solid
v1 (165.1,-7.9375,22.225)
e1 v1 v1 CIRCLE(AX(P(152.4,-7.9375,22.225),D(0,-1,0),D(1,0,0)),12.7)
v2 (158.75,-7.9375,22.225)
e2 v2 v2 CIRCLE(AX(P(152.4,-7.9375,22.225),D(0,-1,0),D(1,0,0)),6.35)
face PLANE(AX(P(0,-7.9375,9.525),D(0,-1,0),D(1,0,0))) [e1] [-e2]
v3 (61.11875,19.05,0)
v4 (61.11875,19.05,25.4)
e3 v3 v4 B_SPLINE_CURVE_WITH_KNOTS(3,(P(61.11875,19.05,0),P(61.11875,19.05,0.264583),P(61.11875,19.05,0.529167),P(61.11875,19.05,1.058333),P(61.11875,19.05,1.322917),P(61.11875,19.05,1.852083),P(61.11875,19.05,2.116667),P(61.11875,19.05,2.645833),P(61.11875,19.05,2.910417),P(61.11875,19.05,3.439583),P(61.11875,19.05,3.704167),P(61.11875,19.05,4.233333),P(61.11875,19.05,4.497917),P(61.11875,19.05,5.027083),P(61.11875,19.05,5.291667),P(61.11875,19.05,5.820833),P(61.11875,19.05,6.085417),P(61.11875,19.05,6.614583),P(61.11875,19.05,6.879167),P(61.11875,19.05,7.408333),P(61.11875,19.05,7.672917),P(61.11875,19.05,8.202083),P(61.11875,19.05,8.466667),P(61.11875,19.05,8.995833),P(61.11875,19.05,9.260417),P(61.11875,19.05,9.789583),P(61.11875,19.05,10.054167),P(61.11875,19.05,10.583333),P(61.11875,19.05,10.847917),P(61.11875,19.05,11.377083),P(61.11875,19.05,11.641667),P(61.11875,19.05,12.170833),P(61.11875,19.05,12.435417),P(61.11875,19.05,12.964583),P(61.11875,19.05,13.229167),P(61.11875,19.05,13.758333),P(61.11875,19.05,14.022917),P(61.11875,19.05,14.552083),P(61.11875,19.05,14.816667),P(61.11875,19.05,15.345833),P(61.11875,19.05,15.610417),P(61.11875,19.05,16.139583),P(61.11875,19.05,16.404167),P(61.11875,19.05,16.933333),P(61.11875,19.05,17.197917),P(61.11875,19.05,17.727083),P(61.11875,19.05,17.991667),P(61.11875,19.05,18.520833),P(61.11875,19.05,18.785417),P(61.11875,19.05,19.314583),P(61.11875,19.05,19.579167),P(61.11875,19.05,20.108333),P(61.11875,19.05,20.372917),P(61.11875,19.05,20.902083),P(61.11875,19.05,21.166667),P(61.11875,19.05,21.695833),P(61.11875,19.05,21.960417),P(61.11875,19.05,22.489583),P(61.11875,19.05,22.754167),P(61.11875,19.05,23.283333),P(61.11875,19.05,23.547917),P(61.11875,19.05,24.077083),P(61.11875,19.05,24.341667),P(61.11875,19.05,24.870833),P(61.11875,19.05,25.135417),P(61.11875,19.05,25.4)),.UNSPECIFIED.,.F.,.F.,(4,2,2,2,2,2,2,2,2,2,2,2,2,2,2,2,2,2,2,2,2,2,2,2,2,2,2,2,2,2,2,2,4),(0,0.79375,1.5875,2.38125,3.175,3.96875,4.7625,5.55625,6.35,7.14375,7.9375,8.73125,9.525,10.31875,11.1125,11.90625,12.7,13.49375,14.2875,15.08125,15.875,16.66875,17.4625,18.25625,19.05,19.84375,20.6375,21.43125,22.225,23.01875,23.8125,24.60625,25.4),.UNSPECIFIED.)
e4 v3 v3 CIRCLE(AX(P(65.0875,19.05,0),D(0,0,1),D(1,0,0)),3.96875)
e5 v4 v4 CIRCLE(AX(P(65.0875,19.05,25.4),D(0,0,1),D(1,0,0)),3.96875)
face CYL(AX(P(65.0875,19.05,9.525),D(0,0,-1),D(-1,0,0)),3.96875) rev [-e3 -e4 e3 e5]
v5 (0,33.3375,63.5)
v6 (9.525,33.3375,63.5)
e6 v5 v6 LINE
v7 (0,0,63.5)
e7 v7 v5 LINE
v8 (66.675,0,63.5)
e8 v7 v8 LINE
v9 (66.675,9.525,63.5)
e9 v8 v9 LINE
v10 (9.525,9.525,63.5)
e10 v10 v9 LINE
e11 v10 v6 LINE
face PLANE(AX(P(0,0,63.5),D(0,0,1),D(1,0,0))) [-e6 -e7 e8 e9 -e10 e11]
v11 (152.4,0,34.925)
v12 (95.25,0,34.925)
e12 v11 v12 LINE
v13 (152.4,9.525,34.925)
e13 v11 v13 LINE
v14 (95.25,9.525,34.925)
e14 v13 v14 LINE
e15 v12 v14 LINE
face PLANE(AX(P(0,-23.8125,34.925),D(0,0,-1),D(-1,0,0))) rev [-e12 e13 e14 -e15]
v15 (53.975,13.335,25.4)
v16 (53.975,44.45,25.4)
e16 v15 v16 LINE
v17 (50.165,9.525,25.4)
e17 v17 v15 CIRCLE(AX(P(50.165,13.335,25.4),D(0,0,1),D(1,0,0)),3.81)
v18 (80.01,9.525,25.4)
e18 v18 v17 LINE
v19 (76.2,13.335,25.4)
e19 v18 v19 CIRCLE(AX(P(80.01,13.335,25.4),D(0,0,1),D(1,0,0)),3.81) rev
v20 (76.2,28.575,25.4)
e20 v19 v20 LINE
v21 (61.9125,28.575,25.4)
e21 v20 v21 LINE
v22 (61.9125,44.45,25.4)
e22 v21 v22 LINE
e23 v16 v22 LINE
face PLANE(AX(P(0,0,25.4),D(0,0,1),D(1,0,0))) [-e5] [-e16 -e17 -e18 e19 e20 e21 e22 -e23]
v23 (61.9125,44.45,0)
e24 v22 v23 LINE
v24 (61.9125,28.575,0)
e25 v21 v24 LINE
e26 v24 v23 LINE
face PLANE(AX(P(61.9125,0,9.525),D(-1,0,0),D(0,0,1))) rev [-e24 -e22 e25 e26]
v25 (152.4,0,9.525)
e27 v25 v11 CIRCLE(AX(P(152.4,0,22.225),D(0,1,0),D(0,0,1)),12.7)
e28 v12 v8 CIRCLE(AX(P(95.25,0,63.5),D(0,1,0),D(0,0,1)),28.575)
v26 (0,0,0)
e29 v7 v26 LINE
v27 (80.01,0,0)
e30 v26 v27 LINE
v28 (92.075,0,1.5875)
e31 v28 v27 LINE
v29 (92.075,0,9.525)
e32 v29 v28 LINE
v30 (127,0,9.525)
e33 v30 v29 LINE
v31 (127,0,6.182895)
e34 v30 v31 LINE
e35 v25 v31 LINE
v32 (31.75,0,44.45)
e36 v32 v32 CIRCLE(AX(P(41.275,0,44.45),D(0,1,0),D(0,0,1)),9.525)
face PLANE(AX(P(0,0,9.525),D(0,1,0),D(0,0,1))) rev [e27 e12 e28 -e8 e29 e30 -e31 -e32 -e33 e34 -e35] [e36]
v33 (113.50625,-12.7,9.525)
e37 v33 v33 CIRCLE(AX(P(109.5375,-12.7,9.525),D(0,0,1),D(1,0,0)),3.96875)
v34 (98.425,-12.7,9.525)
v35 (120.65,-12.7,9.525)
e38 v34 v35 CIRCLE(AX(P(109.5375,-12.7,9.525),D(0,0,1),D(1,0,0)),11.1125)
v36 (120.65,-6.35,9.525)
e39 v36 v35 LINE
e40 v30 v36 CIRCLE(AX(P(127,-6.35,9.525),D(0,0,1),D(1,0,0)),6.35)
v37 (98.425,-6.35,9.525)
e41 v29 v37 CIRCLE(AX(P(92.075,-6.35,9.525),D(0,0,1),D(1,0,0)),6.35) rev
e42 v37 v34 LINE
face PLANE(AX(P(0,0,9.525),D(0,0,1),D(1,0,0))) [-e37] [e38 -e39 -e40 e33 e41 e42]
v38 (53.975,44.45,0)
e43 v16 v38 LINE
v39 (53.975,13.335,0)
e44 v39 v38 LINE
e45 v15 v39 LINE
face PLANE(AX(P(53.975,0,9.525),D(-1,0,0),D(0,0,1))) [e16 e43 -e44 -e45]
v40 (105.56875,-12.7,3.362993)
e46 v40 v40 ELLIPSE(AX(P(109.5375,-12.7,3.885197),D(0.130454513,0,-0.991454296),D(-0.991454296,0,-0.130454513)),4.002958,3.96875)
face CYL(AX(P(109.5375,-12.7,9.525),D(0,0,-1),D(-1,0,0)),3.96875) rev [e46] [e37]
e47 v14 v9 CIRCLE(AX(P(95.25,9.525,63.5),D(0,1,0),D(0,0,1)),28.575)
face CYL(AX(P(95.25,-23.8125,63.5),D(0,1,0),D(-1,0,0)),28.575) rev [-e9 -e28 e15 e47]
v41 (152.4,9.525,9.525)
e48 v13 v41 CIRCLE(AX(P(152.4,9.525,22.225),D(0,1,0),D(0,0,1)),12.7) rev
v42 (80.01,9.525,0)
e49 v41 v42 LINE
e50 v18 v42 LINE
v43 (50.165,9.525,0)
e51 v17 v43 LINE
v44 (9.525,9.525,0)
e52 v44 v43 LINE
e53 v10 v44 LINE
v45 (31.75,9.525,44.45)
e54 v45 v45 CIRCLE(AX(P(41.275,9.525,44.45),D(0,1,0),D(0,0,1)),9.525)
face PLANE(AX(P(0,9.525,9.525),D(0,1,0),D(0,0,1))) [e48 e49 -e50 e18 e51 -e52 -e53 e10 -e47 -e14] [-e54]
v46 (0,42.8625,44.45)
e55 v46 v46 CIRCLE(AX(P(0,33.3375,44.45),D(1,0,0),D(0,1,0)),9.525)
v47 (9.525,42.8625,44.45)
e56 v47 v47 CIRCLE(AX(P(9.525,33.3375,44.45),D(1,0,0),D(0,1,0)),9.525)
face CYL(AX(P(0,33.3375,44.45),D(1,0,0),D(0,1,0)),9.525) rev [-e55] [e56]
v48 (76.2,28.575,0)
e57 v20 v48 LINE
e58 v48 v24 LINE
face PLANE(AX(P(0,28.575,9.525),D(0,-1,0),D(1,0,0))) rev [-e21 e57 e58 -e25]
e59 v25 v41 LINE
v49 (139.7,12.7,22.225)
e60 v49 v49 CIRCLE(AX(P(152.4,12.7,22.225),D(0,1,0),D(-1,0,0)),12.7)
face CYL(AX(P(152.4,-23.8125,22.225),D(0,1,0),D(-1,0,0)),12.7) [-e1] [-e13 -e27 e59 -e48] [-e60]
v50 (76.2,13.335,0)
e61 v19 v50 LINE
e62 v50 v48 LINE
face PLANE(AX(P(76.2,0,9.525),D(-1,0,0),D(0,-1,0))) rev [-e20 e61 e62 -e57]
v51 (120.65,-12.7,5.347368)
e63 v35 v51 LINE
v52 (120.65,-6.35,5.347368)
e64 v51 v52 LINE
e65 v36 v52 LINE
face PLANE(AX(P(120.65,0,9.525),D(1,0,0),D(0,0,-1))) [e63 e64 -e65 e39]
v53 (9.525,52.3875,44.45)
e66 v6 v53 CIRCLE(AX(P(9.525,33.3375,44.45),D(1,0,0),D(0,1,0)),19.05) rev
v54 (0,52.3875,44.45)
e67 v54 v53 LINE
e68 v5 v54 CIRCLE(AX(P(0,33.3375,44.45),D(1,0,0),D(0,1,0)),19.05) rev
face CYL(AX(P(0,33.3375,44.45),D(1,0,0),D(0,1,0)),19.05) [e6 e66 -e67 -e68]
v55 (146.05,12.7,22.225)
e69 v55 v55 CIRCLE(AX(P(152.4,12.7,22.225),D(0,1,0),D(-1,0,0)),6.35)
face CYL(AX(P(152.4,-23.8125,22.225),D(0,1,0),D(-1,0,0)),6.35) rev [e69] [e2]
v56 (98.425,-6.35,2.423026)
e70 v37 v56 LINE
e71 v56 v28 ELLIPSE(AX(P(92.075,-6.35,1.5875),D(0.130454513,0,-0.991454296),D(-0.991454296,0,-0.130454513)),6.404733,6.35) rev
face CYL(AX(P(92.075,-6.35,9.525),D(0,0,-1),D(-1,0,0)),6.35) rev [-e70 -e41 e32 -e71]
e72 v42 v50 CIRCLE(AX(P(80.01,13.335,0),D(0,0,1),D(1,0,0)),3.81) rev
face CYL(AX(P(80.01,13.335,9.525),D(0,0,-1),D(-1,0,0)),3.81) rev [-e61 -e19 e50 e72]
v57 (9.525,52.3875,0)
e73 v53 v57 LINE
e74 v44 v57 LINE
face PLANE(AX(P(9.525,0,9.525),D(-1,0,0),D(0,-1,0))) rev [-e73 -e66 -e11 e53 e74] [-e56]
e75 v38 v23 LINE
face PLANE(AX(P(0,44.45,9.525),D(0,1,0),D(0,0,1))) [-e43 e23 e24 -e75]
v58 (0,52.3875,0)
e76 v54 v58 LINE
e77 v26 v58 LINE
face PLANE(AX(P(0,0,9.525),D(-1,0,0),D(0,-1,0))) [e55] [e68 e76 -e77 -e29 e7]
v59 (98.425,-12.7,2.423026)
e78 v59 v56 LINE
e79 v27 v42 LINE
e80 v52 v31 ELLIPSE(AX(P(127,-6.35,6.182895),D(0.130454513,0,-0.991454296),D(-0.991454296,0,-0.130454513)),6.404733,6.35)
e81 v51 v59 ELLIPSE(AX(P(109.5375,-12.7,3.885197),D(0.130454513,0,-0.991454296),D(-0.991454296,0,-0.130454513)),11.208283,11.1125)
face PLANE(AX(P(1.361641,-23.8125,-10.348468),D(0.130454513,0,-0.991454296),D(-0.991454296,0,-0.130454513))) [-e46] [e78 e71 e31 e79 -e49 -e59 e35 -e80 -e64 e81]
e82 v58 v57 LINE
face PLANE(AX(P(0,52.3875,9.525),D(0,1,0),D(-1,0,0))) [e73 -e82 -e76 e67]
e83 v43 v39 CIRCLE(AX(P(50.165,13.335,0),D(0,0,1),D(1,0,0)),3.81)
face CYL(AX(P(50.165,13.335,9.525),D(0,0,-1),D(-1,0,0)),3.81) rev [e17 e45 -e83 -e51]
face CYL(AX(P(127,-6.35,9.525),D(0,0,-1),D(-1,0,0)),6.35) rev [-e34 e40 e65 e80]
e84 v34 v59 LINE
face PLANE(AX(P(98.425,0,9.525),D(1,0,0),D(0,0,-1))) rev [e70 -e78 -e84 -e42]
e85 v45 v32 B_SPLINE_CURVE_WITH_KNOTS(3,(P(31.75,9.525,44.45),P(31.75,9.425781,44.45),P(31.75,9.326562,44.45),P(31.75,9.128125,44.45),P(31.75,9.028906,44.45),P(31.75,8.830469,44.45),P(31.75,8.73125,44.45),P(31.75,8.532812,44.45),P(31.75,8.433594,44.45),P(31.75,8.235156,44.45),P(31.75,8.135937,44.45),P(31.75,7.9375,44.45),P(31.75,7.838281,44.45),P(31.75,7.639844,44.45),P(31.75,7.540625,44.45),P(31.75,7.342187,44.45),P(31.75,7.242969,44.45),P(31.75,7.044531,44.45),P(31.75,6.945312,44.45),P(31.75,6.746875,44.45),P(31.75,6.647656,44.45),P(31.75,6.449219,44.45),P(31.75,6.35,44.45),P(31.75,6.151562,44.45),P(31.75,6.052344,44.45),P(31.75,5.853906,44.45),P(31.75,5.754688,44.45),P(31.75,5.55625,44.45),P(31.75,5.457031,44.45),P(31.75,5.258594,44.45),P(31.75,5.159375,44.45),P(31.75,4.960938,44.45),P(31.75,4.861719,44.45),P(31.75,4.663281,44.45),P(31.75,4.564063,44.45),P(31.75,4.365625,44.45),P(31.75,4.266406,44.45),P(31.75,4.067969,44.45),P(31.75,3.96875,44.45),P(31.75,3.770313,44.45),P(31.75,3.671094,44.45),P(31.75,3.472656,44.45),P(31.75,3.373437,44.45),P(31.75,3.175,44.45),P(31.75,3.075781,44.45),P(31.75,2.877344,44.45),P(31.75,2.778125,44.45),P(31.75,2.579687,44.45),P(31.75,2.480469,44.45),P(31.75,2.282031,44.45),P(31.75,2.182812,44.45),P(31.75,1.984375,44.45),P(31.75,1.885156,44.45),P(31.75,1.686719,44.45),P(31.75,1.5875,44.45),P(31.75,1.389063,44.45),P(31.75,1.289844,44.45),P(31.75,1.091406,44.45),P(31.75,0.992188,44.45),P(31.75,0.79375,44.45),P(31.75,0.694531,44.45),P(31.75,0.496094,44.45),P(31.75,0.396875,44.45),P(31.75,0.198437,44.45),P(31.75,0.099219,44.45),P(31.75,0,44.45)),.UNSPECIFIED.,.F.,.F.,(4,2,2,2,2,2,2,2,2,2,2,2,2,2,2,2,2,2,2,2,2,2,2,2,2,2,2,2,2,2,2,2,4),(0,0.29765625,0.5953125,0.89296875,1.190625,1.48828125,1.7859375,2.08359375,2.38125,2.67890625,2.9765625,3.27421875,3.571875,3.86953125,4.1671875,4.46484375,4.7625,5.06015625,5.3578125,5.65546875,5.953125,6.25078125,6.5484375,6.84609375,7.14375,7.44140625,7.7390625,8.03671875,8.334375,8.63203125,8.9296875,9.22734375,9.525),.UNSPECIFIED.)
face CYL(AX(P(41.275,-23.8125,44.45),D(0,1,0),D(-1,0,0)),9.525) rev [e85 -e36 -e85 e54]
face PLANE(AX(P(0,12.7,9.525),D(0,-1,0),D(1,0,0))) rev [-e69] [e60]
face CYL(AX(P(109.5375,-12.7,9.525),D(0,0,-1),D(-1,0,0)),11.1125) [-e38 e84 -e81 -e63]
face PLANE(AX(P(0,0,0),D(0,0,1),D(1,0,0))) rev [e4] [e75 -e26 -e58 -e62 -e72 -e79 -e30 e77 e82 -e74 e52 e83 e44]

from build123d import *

# Parameters (mm, degrees)
SKETCH1_R               = 3.96875
BOSS_EXTRUDE1_DEPTH     = 9.525
BOSS_EXTRUDE4_START     = 9.525
BOSS_EXTRUDE4_OUTLINE_R = 3.96875
BOSS_EXTRUDE4_DEPTH     = 15.875
BOSS_EXTRUDE5_START     = 25.4
BOSS_EXTRUDE5_DEPTH     = 38.1
SKETCH4_R               = 9.525
CUT_EXTRUDE1_DEPTH      = 177.01216089
SKETCH2_R               = 9.525
SKETCH2_W               = 12.7
SKETCH2_H               = 28.575
CUT_EXTRUDE2_DEPTH      = 182.288051609
CUT_EXTRUDE3_DEPTH      = 3.175
CUT_EXTRUDE4_START      = -12.7
CUT_EXTRUDE4_DEPTH      = 7.9375


# Read off the part's stored shape, not the designer's step: Boss-Extrude4, Boss-Extrude5
with BuildPart() as part:
    # Sketch1 → Boss-Extrude1 (new body)
    with BuildSketch(Plane.XY):
        with BuildLine():
            Line((0, 0), (92.075, 0))
            ThreePointArc((92.075, 0), (96.565128061, -1.859871939), (98.425, -6.35))
            Line((98.425, -6.35), (98.425, -12.7))
            ThreePointArc((98.425, -12.7), (109.5375, -23.8125), (120.65, -12.7))
            Line((120.65, -12.7), (120.65, -6.35))
            ThreePointArc((120.65, -6.35), (122.509871939, -1.859871939), (127, 0))
            Line((127, 0), (139.7, 0))
            Line((139.7, 0), (139.7, -7.9375))
            Line((139.7, -7.9375), (165.1, -7.9375))
            Line((165.1, -7.9375), (165.1, 12.7))
            Line((165.1, 12.7), (139.7, 12.7))
            Line((139.7, 12.7), (139.7, 9.525))
            Line((139.7, 9.525), (80.01, 9.525))
            ThreePointArc((80.01, 9.525), (77.315923164, 10.640923164), (76.2, 13.335))
            Line((76.2, 13.335), (76.2, 28.575))
            Line((76.2, 28.575), (61.9125, 28.575))
            Line((61.9125, 28.575), (61.9125, 44.45))
            Line((61.9125, 44.45), (53.975, 44.45))
            Line((53.975, 44.45), (53.975, 13.335))
            ThreePointArc((53.975, 13.335), (52.859076836, 10.640923164), (50.165, 9.525))
            Line((50.165, 9.525), (9.525, 9.525))
            Line((9.525, 9.525), (9.525, 52.3875))
            Line((9.525, 52.3875), (0, 52.3875))
            Line((0, 52.3875), (0, 0))
        make_face()
        with Locations(Location((109.5375, -12.7, 0), (0, 0, 180))):
            Circle(SKETCH1_R, mode=Mode.SUBTRACT)
        with Locations(Location((65.0875, 19.05, 0), (0, 0, 180))):
            Circle(SKETCH1_R, mode=Mode.SUBTRACT)
    extrude(amount=BOSS_EXTRUDE1_DEPTH)

    # Boss-Extrude4 outline → Boss-Extrude4 (add)
    with BuildSketch(Plane.XY.offset(BOSS_EXTRUDE4_START)):
        with BuildLine():
            Line((9.525, 52.3875), (0, 52.3875))
            Line((0, 52.3875), (0, 0))
            Line((0, 0), (139.7, 0))
            Line((139.7, 0), (139.7, -7.9375))
            Line((139.7, -7.9375), (165.1, -7.9375))
            Line((165.1, -7.9375), (165.1, 12.7))
            Line((165.1, 12.7), (139.7, 12.7))
            Line((139.7, 12.7), (139.7, 9.525))
            Line((139.7, 9.525), (80.01, 9.525))
            ThreePointArc((80.01, 9.525), (77.315923164, 10.640923164), (76.2, 13.335))
            Line((76.2, 13.335), (76.2, 28.575))
            Line((76.2, 28.575), (61.9125, 28.575))
            Line((61.9125, 28.575), (61.9125, 44.45))
            Line((61.9125, 44.45), (53.975, 44.45))
            Line((53.975, 44.45), (53.975, 13.335))
            ThreePointArc((53.975, 13.335), (52.859076836, 10.640923164), (50.165, 9.525))
            Line((50.165, 9.525), (9.525, 9.525))
            Line((9.525, 9.525), (9.525, 52.3875))
        make_face()
        with Locations((65.0875, 19.05)):
            Circle(BOSS_EXTRUDE4_OUTLINE_R, mode=Mode.SUBTRACT)
    extrude(amount=BOSS_EXTRUDE4_DEPTH)

    # Boss-Extrude5 outline → Boss-Extrude5 (add)
    with BuildSketch(Plane.XY.offset(BOSS_EXTRUDE5_START)):
        Polygon((9.525, 52.3875), (0, 52.3875), (0, 0), (139.7, 0), (139.7, -7.9375), (165.1, -7.9375), (165.1, 12.7), (139.7, 12.7), (139.7, 9.525), (9.525, 9.525), align=None)
    extrude(amount=BOSS_EXTRUDE5_DEPTH)

    # Sketch4 → Cut-Extrude1 (cut, through all)
    with BuildSketch(Plane(origin=(9.525, 0, 0), x_dir=(0, 0, -1), z_dir=(1, 0, 0))):
        with BuildLine():
            Line((-63.5, 52.3875), (-63.5, 33.3375))
            ThreePointArc((-63.5, 33.3375), (-57.920384182, 46.807884182), (-44.45, 52.3875))
            Line((-44.45, 52.3875), (-63.5, 52.3875))
        make_face()
        with Locations(Location((-44.45, 33.3375, 0), (0, 0, 90))):
            Circle(SKETCH4_R)
    extrude(amount=-CUT_EXTRUDE1_DEPTH, mode=Mode.SUBTRACT)

    # Sketch2 → Cut-Extrude2 (cut, through all)
    with BuildSketch(Plane(origin=(0, 12.7, 0), x_dir=(1, 0, 0), z_dir=(0, 1, 0))):
        with Locations(Location((41.275, -44.45, 0), (0, 0, 180))):
            Circle(SKETCH2_R)
        with BuildLine():
            ThreePointArc((123.825, -63.5), (115.455576272, -43.294423728), (95.25, -34.925))
            ThreePointArc((95.25, -34.925), (75.044423728, -43.294423728), (66.675, -63.5))
            Line((66.675, -63.5), (123.825, -63.5))
        make_face()
        with BuildLine():
            ThreePointArc((66.675, -63.5), (95.25, -92.075), (123.825, -63.5))
            Line((123.825, -63.5), (66.675, -63.5))
        make_face()
        with BuildLine():
            Line((139.7, -63.5), (139.7, -34.925))
            Line((139.7, -34.925), (95.25, -34.925))
            ThreePointArc((95.25, -34.925), (115.455576272, -43.294423728), (123.825, -63.5))
            Line((123.825, -63.5), (139.7, -63.5))
        make_face()
        with BuildLine():
            Line((165.1, -63.5), (165.1, -22.225))
            ThreePointArc((165.1, -22.225), (161.380256121, -31.205256121), (152.4, -34.925))
            Line((152.4, -34.925), (152.4, -63.5))
            Line((152.4, -63.5), (165.1, -63.5))
        make_face()
        with Locations((146.05, -49.2125)):
            Rectangle(SKETCH2_W, SKETCH2_H)
        with BuildLine():
            Line((165.1, 0), (152.4, 0))
            Line((152.4, 0), (152.4, -9.525))
            ThreePointArc((152.4, -9.525), (161.380256121, -13.244743879), (165.1, -22.225))
            Line((165.1, -22.225), (165.1, 0))
        make_face()
        Polygon((152.4, -9.525), (152.4, 0), (139.7, 0), (139.7, -7.853947368), align=None)
        Polygon((139.7, -7.853947368), (139.7, 0), (80.01, 0), align=None)
        with BuildLine():
            ThreePointArc((158.75, -22.225), (156.890128061, -17.734871939), (152.4, -15.875))
            Line((152.4, -15.875), (152.4, -28.575))
            ThreePointArc((152.4, -28.575), (156.890128061, -26.715128061), (158.75, -22.225))
        make_face()
        with BuildLine():
            Line((152.4, -28.575), (152.4, -15.875))
            ThreePointArc((152.4, -15.875), (146.05, -22.225), (152.4, -28.575))
        make_face()
    extrude(amount=-CUT_EXTRUDE2_DEPTH, mode=Mode.SUBTRACT)

    # Sketch2<3> → Cut-Extrude3 (cut)
    with BuildSketch(Plane(origin=(0, 12.7, 0), x_dir=(1, 0, 0), z_dir=(0, 1, 0))):
        with BuildLine():
            ThreePointArc((152.4, -34.925), (143.419743879, -31.205256121), (139.7, -22.225))
            Line((139.7, -22.225), (139.7, -34.925))
            Line((139.7, -34.925), (152.4, -34.925))
        make_face()
        with BuildLine():
            ThreePointArc((139.7, -22.225), (143.419743879, -13.244743879), (152.4, -9.525))
            Line((152.4, -9.525), (139.7, -7.853947368))
            Line((139.7, -7.853947368), (139.7, -22.225))
        make_face()
    extrude(amount=-CUT_EXTRUDE3_DEPTH, mode=Mode.SUBTRACT)

    # Sketch2<5> → Cut-Extrude4 (cut)
    with BuildSketch(Plane(origin=(0, 12.7, 0), x_dir=(1, 0, 0), z_dir=(0, 1, 0)).offset(CUT_EXTRUDE4_START)):
        with BuildLine():
            ThreePointArc((139.7, -22.225), (143.419743879, -13.244743879), (152.4, -9.525))
            Line((152.4, -9.525), (139.7, -7.853947368))
            Line((139.7, -7.853947368), (139.7, -22.225))
        make_face()
        with BuildLine():
            ThreePointArc((152.4, -34.925), (143.419743879, -31.205256121), (139.7, -22.225))
            Line((139.7, -22.225), (139.7, -34.925))
            Line((139.7, -34.925), (152.4, -34.925))
        make_face()
    extrude(amount=-CUT_EXTRUDE4_DEPTH, mode=Mode.SUBTRACT)


solid = part.part
